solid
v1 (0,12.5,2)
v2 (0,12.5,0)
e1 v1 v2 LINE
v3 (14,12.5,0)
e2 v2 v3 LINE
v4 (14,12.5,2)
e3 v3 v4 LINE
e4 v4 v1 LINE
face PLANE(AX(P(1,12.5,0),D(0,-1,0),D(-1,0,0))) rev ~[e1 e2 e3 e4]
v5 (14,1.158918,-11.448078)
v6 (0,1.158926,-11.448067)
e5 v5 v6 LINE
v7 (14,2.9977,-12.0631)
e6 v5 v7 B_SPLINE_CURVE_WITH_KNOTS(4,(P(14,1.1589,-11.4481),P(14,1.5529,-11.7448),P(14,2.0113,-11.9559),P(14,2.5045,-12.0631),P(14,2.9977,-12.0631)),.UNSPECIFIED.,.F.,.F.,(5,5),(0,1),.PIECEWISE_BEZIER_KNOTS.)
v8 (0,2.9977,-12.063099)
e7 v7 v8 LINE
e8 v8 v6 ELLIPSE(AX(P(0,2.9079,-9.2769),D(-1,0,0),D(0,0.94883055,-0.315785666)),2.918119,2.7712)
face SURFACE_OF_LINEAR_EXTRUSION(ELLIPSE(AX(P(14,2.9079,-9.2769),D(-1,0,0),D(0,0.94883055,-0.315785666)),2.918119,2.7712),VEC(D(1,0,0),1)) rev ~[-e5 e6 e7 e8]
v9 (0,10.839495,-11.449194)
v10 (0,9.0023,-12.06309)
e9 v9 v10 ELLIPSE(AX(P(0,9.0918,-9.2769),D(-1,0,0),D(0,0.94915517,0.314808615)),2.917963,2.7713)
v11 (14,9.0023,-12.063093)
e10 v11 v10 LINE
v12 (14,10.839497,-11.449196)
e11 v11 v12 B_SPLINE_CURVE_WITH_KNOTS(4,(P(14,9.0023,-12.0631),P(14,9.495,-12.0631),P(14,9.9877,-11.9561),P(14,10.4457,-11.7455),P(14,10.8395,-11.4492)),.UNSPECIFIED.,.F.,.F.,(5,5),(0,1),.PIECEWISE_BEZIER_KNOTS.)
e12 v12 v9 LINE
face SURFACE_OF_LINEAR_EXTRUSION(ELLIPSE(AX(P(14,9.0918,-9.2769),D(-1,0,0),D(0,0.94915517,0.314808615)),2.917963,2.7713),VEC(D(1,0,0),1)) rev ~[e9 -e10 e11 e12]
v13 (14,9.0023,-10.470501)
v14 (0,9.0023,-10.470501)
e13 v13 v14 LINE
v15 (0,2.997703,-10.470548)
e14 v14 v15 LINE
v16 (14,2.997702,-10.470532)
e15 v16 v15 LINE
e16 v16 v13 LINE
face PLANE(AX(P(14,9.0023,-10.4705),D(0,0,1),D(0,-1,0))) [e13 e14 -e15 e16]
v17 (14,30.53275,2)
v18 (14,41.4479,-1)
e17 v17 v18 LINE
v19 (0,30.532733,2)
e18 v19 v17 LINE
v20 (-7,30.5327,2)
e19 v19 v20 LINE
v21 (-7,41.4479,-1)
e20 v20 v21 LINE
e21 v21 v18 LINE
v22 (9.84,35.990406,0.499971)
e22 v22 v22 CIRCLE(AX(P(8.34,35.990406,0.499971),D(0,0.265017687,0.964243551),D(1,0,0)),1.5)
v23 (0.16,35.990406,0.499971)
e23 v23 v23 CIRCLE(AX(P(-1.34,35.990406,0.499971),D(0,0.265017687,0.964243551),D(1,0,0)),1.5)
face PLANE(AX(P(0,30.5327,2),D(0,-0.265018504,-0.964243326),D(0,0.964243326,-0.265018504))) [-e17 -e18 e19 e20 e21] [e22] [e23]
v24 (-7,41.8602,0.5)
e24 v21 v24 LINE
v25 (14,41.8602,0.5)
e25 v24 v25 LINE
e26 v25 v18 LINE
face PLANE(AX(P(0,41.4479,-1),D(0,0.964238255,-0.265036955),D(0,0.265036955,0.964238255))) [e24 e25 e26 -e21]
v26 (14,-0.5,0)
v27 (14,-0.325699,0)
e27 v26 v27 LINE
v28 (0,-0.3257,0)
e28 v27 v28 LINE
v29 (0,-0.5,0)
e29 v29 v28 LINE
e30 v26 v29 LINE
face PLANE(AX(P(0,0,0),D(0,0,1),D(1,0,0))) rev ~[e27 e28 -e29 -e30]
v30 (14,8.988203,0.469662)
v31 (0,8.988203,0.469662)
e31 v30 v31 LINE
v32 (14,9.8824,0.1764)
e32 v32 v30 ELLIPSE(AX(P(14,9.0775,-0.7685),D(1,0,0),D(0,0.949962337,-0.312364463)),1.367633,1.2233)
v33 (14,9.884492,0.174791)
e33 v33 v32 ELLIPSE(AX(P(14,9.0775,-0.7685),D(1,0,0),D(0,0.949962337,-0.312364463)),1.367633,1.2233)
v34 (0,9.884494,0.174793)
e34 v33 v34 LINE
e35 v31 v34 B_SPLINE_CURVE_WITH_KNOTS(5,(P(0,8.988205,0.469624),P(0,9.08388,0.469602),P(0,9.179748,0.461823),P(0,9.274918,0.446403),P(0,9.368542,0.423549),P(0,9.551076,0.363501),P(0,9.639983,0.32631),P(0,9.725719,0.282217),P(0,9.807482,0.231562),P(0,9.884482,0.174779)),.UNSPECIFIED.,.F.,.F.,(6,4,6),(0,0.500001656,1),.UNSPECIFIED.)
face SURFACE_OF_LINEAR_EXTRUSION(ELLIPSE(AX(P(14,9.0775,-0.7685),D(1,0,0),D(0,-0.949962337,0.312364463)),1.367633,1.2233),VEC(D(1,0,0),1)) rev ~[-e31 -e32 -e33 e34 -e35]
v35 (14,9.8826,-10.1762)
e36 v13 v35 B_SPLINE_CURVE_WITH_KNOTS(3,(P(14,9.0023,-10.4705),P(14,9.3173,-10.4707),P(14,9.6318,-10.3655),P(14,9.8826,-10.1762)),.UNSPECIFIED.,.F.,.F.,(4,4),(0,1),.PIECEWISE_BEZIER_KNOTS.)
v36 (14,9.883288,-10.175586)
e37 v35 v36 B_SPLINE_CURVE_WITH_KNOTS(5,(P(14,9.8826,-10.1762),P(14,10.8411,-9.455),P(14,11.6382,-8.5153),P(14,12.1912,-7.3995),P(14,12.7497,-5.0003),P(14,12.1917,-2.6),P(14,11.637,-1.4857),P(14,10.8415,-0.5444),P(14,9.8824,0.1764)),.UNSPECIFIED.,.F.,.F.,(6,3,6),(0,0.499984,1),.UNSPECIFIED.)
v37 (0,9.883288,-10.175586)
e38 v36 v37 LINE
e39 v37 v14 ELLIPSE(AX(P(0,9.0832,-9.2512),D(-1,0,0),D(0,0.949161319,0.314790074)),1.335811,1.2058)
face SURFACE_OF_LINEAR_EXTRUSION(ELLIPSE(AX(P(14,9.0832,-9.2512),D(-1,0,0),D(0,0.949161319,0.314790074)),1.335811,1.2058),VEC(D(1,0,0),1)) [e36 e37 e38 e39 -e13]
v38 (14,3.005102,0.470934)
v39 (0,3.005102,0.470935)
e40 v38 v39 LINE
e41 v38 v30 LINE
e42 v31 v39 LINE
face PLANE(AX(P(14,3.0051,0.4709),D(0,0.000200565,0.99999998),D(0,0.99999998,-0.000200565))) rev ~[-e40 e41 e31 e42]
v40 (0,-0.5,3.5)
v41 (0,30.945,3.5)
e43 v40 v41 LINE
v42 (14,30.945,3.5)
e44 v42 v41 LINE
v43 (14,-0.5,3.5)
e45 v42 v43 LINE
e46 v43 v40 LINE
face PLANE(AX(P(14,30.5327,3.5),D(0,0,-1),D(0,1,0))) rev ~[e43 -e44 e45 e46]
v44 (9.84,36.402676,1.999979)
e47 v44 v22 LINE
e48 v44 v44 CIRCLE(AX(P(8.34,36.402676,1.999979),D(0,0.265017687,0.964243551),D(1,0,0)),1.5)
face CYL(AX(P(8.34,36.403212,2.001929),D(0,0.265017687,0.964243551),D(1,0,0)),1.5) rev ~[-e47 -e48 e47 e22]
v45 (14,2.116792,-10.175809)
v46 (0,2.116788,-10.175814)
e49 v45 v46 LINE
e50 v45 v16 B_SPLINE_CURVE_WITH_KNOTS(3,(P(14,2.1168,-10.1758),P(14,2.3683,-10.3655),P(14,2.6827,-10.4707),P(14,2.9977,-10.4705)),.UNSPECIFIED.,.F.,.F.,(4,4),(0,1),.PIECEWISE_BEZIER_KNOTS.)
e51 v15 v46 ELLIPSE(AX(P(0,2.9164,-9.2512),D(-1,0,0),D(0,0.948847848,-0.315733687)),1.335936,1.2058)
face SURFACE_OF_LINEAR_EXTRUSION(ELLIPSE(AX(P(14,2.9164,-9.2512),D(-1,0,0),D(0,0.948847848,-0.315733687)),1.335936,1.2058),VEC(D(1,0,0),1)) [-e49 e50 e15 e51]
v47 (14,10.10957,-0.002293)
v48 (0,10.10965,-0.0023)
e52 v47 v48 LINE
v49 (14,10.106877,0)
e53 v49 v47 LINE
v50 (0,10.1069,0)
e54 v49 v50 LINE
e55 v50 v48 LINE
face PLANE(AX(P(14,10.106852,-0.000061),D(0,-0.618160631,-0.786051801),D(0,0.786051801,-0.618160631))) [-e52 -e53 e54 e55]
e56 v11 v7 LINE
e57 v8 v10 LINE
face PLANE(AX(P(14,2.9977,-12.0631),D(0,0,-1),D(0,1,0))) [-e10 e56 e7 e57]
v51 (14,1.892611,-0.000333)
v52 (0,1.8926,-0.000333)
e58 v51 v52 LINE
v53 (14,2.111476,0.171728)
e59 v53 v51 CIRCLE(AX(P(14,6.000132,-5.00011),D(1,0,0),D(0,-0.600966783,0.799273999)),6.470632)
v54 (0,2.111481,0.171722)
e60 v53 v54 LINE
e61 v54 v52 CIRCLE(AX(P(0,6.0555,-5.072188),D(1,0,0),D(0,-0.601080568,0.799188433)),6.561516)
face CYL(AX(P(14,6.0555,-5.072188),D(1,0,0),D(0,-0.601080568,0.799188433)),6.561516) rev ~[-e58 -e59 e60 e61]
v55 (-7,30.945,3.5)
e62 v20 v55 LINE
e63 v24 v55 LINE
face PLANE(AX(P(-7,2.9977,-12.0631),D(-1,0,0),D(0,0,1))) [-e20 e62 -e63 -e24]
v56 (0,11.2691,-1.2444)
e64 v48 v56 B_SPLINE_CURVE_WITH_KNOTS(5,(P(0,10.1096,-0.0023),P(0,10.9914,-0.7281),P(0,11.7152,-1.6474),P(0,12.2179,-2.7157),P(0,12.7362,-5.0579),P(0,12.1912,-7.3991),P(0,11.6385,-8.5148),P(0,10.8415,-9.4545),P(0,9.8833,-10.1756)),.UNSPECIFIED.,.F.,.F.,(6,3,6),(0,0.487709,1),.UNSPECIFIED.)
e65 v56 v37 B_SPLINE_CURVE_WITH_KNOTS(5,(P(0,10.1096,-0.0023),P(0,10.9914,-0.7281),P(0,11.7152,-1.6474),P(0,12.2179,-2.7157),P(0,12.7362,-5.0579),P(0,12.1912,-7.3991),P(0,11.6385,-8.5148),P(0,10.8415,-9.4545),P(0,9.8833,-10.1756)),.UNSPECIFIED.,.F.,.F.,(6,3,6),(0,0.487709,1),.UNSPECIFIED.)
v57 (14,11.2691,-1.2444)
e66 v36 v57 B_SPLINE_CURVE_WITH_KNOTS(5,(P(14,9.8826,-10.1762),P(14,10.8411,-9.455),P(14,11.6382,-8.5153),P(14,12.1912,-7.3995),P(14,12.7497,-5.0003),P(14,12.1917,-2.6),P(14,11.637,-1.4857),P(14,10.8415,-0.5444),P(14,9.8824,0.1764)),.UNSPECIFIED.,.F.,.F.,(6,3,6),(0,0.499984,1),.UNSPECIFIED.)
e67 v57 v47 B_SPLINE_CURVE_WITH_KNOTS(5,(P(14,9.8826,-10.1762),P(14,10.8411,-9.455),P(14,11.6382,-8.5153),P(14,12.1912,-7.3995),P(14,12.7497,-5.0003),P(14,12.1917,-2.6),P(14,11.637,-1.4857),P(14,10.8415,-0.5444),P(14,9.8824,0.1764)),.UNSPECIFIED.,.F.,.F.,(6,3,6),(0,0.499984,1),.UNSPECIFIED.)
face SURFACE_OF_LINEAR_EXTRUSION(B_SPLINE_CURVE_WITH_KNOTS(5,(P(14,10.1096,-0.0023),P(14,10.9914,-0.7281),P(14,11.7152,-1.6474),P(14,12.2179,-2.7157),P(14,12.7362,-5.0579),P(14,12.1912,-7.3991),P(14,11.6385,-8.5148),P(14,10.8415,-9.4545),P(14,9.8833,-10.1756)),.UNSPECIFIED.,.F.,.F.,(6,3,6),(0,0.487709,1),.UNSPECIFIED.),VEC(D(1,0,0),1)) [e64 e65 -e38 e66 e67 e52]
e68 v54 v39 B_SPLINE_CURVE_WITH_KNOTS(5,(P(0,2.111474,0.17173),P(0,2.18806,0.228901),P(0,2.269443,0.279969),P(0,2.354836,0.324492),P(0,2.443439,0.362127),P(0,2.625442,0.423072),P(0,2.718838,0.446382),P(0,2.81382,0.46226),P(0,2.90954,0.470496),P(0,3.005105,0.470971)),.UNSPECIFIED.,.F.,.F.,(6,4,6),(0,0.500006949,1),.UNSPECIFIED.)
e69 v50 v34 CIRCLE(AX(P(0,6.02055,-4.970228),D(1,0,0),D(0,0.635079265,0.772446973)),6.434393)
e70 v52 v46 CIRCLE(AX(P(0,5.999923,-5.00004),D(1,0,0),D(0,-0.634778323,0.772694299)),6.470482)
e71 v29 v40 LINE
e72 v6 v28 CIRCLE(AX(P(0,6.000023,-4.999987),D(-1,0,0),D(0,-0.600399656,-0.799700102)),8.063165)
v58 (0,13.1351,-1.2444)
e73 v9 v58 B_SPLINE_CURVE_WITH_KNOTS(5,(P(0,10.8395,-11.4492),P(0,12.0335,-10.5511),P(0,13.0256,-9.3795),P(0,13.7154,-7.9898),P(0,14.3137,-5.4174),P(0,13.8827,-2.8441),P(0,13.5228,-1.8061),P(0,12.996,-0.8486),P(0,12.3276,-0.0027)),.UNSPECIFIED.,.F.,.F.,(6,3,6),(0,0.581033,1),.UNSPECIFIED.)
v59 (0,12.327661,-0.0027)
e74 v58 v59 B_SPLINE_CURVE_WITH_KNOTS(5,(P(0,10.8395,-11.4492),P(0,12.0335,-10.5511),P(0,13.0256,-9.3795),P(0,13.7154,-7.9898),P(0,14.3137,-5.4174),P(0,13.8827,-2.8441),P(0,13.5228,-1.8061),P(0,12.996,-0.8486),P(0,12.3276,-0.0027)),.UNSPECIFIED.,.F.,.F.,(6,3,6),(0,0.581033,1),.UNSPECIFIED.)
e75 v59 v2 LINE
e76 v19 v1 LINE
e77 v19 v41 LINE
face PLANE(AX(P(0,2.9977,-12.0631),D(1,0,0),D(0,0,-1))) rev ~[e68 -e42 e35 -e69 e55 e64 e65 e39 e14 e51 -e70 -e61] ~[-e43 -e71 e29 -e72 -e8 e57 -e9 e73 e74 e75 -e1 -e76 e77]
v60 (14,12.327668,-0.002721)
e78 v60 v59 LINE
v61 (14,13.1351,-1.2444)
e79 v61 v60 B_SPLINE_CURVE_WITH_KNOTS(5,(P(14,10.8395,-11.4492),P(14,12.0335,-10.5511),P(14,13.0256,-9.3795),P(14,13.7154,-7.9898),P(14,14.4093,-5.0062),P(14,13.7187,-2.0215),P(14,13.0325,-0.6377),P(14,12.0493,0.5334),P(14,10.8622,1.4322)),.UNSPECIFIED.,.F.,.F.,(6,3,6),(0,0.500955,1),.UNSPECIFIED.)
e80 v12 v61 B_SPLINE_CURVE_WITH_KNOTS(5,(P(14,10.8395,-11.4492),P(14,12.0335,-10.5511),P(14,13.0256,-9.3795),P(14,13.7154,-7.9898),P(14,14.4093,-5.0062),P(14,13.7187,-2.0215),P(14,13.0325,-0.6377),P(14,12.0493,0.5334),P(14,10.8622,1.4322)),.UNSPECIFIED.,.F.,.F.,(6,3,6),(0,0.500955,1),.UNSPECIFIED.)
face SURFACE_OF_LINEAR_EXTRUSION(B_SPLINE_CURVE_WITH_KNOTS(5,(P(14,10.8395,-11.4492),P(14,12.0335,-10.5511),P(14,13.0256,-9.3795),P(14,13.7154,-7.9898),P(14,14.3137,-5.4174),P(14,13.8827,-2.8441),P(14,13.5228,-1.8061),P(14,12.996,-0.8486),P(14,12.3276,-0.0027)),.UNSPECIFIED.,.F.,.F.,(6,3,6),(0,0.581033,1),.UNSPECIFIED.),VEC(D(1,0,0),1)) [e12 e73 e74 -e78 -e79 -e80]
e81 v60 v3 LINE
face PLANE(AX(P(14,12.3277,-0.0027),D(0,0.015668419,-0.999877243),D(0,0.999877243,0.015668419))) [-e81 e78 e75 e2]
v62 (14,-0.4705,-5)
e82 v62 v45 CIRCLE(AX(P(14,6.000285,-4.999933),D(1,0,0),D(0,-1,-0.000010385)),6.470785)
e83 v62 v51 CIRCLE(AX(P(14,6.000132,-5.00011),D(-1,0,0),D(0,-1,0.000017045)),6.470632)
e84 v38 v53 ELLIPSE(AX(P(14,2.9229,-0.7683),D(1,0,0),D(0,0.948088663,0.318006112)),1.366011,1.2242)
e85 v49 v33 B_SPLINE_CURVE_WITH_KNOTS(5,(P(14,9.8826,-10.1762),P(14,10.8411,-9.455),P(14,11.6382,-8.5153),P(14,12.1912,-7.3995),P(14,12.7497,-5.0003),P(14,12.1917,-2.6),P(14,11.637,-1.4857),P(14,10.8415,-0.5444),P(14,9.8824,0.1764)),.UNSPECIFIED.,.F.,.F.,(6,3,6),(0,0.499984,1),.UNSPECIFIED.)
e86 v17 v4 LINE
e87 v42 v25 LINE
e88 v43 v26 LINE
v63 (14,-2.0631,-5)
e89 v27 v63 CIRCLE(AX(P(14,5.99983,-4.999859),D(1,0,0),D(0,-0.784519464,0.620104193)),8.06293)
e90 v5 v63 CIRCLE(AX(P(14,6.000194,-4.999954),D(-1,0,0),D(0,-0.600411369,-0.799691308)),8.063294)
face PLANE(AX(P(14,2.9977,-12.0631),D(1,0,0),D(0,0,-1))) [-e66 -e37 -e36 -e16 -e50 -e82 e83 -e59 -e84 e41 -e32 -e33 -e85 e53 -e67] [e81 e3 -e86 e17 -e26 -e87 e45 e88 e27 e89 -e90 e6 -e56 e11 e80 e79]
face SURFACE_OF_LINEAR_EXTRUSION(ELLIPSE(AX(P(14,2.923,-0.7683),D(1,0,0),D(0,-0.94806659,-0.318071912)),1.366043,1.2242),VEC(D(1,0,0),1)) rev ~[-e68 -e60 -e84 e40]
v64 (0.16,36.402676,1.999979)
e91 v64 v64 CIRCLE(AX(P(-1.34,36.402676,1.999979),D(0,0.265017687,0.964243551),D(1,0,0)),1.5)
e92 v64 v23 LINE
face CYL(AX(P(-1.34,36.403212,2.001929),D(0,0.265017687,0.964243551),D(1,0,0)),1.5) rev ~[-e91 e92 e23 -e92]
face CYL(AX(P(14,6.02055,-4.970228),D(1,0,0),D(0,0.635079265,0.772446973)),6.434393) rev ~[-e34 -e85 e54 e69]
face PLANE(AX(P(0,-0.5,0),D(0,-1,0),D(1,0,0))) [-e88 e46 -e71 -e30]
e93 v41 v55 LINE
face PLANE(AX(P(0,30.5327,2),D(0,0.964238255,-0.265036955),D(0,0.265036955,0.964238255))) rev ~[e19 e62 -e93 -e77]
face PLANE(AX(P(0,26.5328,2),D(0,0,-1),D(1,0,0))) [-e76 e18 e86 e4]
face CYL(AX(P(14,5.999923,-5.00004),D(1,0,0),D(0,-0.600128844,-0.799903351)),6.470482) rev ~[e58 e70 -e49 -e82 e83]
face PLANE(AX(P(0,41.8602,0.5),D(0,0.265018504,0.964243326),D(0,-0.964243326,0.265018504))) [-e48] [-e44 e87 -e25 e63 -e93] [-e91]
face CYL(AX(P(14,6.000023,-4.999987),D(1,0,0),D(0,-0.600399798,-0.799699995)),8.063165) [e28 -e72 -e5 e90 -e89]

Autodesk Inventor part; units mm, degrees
ref_plane "YZ Plane" through (0, 0, 0) normal (1, 0, 0) x (0, 1, 0)
ref_plane "XZ Plane" through (0, 0, 0) normal (0, 1, 0) x (-1, 0, 0)
sketch "Sketch1" plane through (0, 0, 0) normal (0, 0, 1) x (1, 0, 0)
  line L0 (1, 9) -> (14, 9) projected
  line L1 (1, 3) -> (1, 9) projected
  line L2 (14, 3) -> (1, 3) projected
  line L3 (14, 9) -> (14, 3) projected
  line L4 (1, 12) -> (14, 12)
  line L5 (1, 0) -> (14, 0)
  line L6 (1, 12.5) -> (14, 12.5)
  line L7 (1, -0.5) -> (14, -0.5)
  line L8 (0, 1.4) -> (0, 10.6) projected
  line L9 (0, -0.5) -> (14, -0.5)
  line L10 (14, -0.5) -> (14, 12.5)
  line L11 (14, 12.5) -> (0, 12.5)
  line L12 (0, 12.5) -> (0, -0.5)
  point P0 (0, 0)
  dimension "d0" = 0.5
  dimension "d1" = 0.5
extrude "Extrusion1" add sketch "Sketch1" along normal blind 2
sketch "Sketch2" plane through (14, -0.5, 0) normal (1, 0, 0) x (0, 0, -1)
  line L0 (10, 9.5) -> (10, 3.5) projected
  line L1 (10.5, 9.5) -> (10.5, 3.5)
  line L2 (0, 13) -> (0, 0) projected
  line L3 (0.0028, 13) -> (0, 0)
  arc A0 (5, 0.5) -> (9.8, 2.9) centre (5, 6.5) ccw projected
  spline S0 degree 3 poles (9.8, 10.1) (9.3822, 10.6561) (8.439, 11.5426) (6.738, 12.3306) (5.0002, 12.5848) (3.2616, 12.3308) (1.5615, 11.5422) (0.6175, 10.6564) (0.2, 10.1) knots 0.000048 0.000048 0.000048 0.000048 1.982593 3.634064 5.285536 6.937008 8.58848 10.571071 10.571071 10.571071 10.571071 weights 1 1 1 1 1 1 1 1 1 projected
  arc A1 (0.2, 2.9) -> (5, 0.5) centre (5, 6.5) ccw projected
  ellipse E0 centre (0.7683, 3.4229) end of major axis (0.4925, 4.2518) minor radius 0.7558 (0, 3.5) -> (0.2, 2.9) ccw projected
  ellipse E1 centre (0.7685, 9.5775) end of major axis (1.0457, 10.4061) minor radius 0.7558 (0.2, 10.1) -> (0, 9.5) ccw projected
  ellipse E2 centre (9.2317, 3.4229) end of major axis (9.5075, 4.2518) minor radius 0.7558 (9.8, 2.9) -> (10, 3.5) ccw projected
  ellipse E3 centre (9.2318, 9.5768) end of major axis (8.9568, 10.4058) minor radius 0.7558 (10, 9.5) -> (9.7999, 10.1) ccw projected
  arc A2 (5, 0.0295) -> (10.1758, 2.6168) centre (5, 6.5) ccw
  arc A3 (-0.1717, 2.6115) -> (5, 0.0295) centre (5, 6.5) ccw
  line L4 (10.4705, 3.4977) -> (10.4705, 9.5023)
  ellipse E4 centre (0.7683, 3.4229) end of major axis (0.3339, 4.718) minor radius 1.2242 (-0.4709, 3.5051) -> (-0.1717, 2.6115) ccw
  ellipse E5 centre (0.7685, 9.5775) end of major axis (1.1957, 10.8767) minor radius 1.2233 (-0.1748, 10.3845) -> (-0.4697, 9.4882) ccw
  arc A4 (0.2, 2.9) -> (9.8, 2.9) centre (5, 6.5) ccw projected
  arc A5 (5, -1.5631) -> (11.4481, 1.6589) centre (5, 6.5) ccw
  arc A6 (-1.4235, 1.6263) -> (5, -1.5631) centre (5, 6.5) ccw
  line L5 (12.0631, 3.4977) -> (12.0631, 9.5023)
  ellipse E6 centre (0.7683, 3.4229) end of major axis (-0.2657, 6.5587) minor radius 2.7801 (-2.0629, 3.5774) -> (-1.4235, 1.6263) ccw
  ellipse E7 centre (0.7685, 9.5775) end of major axis (1.7896, 12.7173) minor radius 2.7798 (-1.4322, 11.3622) -> (-2.0617, 9.4138) ccw
  line L6 (-0.4709, 3.5051) -> (-0.4697, 9.4882)
  line L7 (-2.0629, 3.5774) -> (-2.0617, 9.4138)
  spline S1 degree 5 poles (10.1762, 10.3826) (9.455, 11.3411) (8.5153, 12.1382) (7.3995, 12.6912) (5.0003, 13.2497) (2.6, 12.6917) (1.4857, 12.137) (0.5444, 11.3415) (-0.1764, 10.3824) knots 0 0 0 0 0 0 0.499984 0.499984 0.499984 1 1 1 1 1 1
  spline S2 degree 3 poles (10.1759, 2.6167) (10.3655, 2.8683) (10.4707, 3.1827) (10.4707, 3.4977) knots 0 0 0 0 1 1 1 1
  spline S3 degree 3 poles (10.4707, 9.5023) (10.4707, 9.8173) (10.3655, 10.1318) (10.1757, 10.3833) knots 0 0 0 0 1 1 1 1
  spline S4 degree 4 poles (11.4481, 1.6589) (11.7448, 2.0529) (11.9559, 2.5113) (12.0631, 3.0045) (12.0631, 3.4977) knots 0 0 0 0 0 1 1 1 1 1
  spline S5 degree 4 poles (12.0631, 9.5023) (12.0631, 9.995) (11.9561, 10.4877) (11.7455, 10.9457) (11.4492, 11.3395) knots 0 0 0 0 0 1 1 1 1 1
  spline S6 degree 5 poles (11.4495, 11.3391) (10.5511, 12.5335) (9.3795, 13.5256) (7.9898, 14.2154) (5.0062, 14.9093) (2.0215, 14.2187) (0.6377, 13.5325) (-0.5334, 12.5493) (-1.4322, 11.3622) knots 0 0 0 0 0 0 0.500955 0.500955 0.500955 1 1 1 1 1 1
  point P0 (0, 0.5)
  point P1 (0, 10.6069)
  point P2 (0, 12.8255)
  point P3 (0, 0.1744)
  point P4 (0, 2.393)
  point P5 (0.0005, 2.3924)
  point P6 (0, 0.1743)
  point P7 (0.0027, 12.8276)
  point P8 (0.0023, 10.6096)
extrude "Extrusion2" add sketch "Sketch2" along normal blind 2 contours L3 S6 S5 L5 S4 A5 A6 L2 A3 A2 S2 L4 S3 S1 | S1 E5 L6 E4 A3 L2 A6 E6 L7 E7 S6
sketch "Sketch3" plane through (14, 1.893, 0) normal (1, 0, 0) x (0, 0, -1)
  arc A0 (-0.1717, 0.2185) -> (0, 0) centre (5, 4.107) ccw projected
  line L0 (0, 0) -> (0, 8.2139) projected
  arc A1 (0, 8.2139) -> (-0.1748, 7.9915) centre (4.9785, 4.1209) ccw projected
  ellipse E0 centre (0.7685, 7.1845) end of major axis (0.3413, 5.8853) minor radius 1.2233 (-0.1748, 7.9915) -> (-0.4697, 7.0952) ccw projected
  line L1 (-0.4697, 7.0952) -> (-0.4709, 1.1121) projected
  ellipse E1 centre (0.7683, 1.03) end of major axis (1.2028, -0.2651) minor radius 1.2242 (-0.4709, 1.1121) -> (-0.1717, 0.2185) ccw projected
  point P0 (0, -1.893)
extrude "Extrusion3" cut sketch "Sketch3" against normal through all
sketch "Sketch4" plane through (14, -0.5, 0) normal (-1, 0, 0) x (0, 0, 1)
  line L0 (-10.4705, 9.5023) -> (-10.4705, 3.4977) projected
  ellipse E0 centre (-9.2512, 9.5832) end of major axis (-8.8307, 10.8511) minor radius 1.2058 (-10.1756, 10.3833) -> (-10.4705, 9.5023) ccw projected
  spline S0 degree 5 poles (-0.0023, 10.6096) (-0.7281, 11.4914) (-1.6474, 12.2152) (-2.7157, 12.7179) (-5.0579, 13.2362) (-7.3991, 12.6912) (-8.5148, 12.1385) (-9.4545, 11.3415) (-10.1756, 10.3833) knots 0 0 0 0 0 0 0.487709 0.487709 0.487709 1 1 1 1 1 1 projected
  line L1 (-0.0027, 12.8276) -> (-0.0023, 10.6096) projected
  spline S1 degree 5 poles (-11.4492, 11.3395) (-10.5511, 12.5335) (-9.3795, 13.5256) (-7.9898, 14.2154) (-5.4174, 14.8137) (-2.8441, 14.3827) (-1.8061, 14.0228) (-0.8486, 13.496) (-0.0027, 12.8277) knots 0 0 0 0 0 0 0.581033 0.581033 0.581033 1 1 1 1 1 1 projected
  ellipse E1 centre (-9.2769, 9.5918) end of major axis (-8.3583, 12.3614) minor radius 2.7713 (-11.4492, 11.3395) -> (-12.0631, 9.5023) ccw projected
  line L2 (-12.0631, 3.4977) -> (-12.0631, 9.5023) projected
  ellipse E2 centre (-9.2769, 3.4079) end of major axis (-10.1984, 6.1767) minor radius 2.7712 (-12.0631, 3.4977) -> (-11.4481, 1.6589) ccw projected
  arc A0 (-11.4481, 1.6589) -> (0, 0.1743) centre (-5, 6.5) ccw projected
  line L3 (-0.0005, 2.3924) -> (0, 0.1743) projected
  arc A1 (-10.1758, 2.6168) -> (-0.0005, 2.3924) centre (-5, 6.5) ccw projected
  ellipse E3 centre (-9.2512, 3.4164) end of major axis (-9.673, 4.684) minor radius 1.2058 (-10.4705, 3.4977) -> (-10.1758, 2.6168) ccw projected
  point P0 (0, 0.5)
extrude "Extrusion4" add sketch "Sketch4" along normal up to surface (14 mm away)
sketch "Sketch5" plane through (0, -0.5, 0) normal (0, -1, 0) x (1, 0, 0)
  line L0 (0, 2) -> (14, 2) projected
  line L1 (0, 2) -> (14, 2)
  line L2 (14, 2) -> (14, 3.5)
  line L3 (14, 3.5) -> (0, 3.5)
  line L4 (0, 3.5) -> (0, 2)
  point P0 (0, 0)
  dimension "d22" = 1.5
ref_plane "Work Plane1" through (-71.4012, 38.5222, -12.5) normal (0.0153412, 0.9998823, 0) x (0, 0, 1)
extrude "Extrusion5" add sketch "Sketch5" against normal up to surface surface through (-71.4012, 38.5222, -12.5) normal (0.0153412, 0.9998823, 0)
sketch "Sketch6" plane through (0, -0.5, 3.5) normal (0, 0, 1) x (1, 0, 0)
  line L0 (14, 0) -> (14, 37.7119) projected
  line L1 (14, 37.7119) -> (0, 37.9267) projected
  line L2 (-54.2389, 27.7576) -> (-67.6625, 27.9635) projected
  line L3 (14, 37.7119) -> (14, 26.7106)
  line L4 (14, 13) -> (14, 37.7119) projected
  line L5 (14, 26.7106) -> (-6.9975, 27.0328)
  line L6 (14, 37.7119) -> (-6.9975, 38.034)
  line L7 (-6.9975, 38.034) -> (-6.9975, 27.0328)
  point P0 (0, 0.5)
  point P1 (4.9084, 26.8501)
  dimension "d25" = 21
  dimension "d26" = 21
extrude "Extrusion6" add sketch "Sketch6" against normal blind 1.5
sketch "Sketch7" plane through (0, -0.5, 3.5) normal (0, 0, 1) x (1, 0, 0)
  line L0 (14, 0) -> (14, 37.7119) projected
  line L1 (14, -3.9463) -> (21.7341, -3.9463)
  line L2 (21.7341, -3.9463) -> (21.7341, 19.3789)
  line L3 (21.7341, 19.3789) -> (14, 19.3789)
  line L4 (14, 19.3789) -> (14, -3.9463)
  point P0 (0, 0.5)
extrude "Extrusion7" cut sketch "Sketch7" against normal blind 15.75
sketch "Sketch8" plane through (14, 10.1069, 0) normal (1, 0, 0) x (0, 0, -1)
  ellipse E0 centre (9.2512, -1.0236) end of major axis (8.8307, 0.2442) minor radius 1.2058 (10.4705, -1.1046) -> (10.1756, -0.2236) ccw projected
  line L0 (10.4705, -7.1091) -> (10.4705, -1.1046) projected
  ellipse E1 centre (9.2512, -7.1904) end of major axis (9.673, -5.9229) minor radius 1.2058 (10.1758, -7.9901) -> (10.4705, -7.1091) ccw projected
  arc A0 (0.0005, -8.2145) -> (10.1758, -7.9901) centre (5, -4.1069) ccw projected
  line L1 (0, -10.4326) -> (0.0005, -8.2145) projected
  arc A1 (0, -10.4326) -> (11.4481, -8.948) centre (5, -4.1069) ccw projected
  ellipse E2 centre (9.2769, -7.199) end of major axis (10.1984, -4.4302) minor radius 2.7712 (11.4481, -8.948) -> (12.0631, -7.1091) ccw projected
  line L2 (12.0631, -1.1046) -> (12.0631, -7.1091) projected
  ellipse E3 centre (9.2769, -1.0151) end of major axis (8.3583, 1.7545) minor radius 2.7713 (12.0631, -1.1046) -> (11.4492, 0.7326) ccw projected
  spline S0 degree 5 poles (0.0027, 2.2208) (0.8486, 2.8891) (1.8061, 3.4159) (2.8441, 3.7759) (5.4174, 4.2068) (7.9898, 3.6085) (9.3795, 2.9188) (10.5511, 1.9266) (11.4492, 0.7326) knots 0 0 0 0 0 0 0.418967 0.418967 0.418967 1 1 1 1 1 1 projected
  line L3 (0.0023, 0.0028) -> (0.0027, 2.2208) projected
  spline S1 degree 5 poles (10.1756, -0.2236) (9.4545, 0.7346) (8.5148, 1.5316) (7.3991, 2.0844) (5.0579, 2.6294) (2.7157, 2.111) (1.6474, 1.6084) (0.7281, 0.8845) (0.0023, 0.0027) knots 0 0 0 0 0 0 0.512291 0.512291 0.512291 1 1 1 1 1 1 projected
  arc A2 (-0.1717, -7.9954) -> (0, -8.2139) centre (5, -4.1069) ccw projected
  ellipse E4 centre (0.7683, -7.184) end of major axis (1.2028, -8.479) minor radius 1.2242 (-0.4709, -7.1018) -> (-0.1717, -7.9954) ccw projected
  ellipse E5 centre (0.7685, -1.0294) end of major axis (0.3413, -2.3286) minor radius 1.2233 (-0.1748, -0.2224) -> (-0.4697, -1.1187) ccw projected
  arc A3 (0, 0) -> (-0.1748, -0.2224) centre (4.9785, -4.093) ccw projected
  line L4 (-0.4697, -1.1187) -> (-0.4709, -7.1018) projected
  line L5 (0, 0) -> (0, 2.3931) projected
  line L6 (0, 2.3931) -> (-2, 2.3931) projected
  line L7 (0, -10.6069) -> (0, -8.2139) projected
  line L8 (0, -10.6069) -> (-3.5, -10.6069) projected
  line L9 (1.2443, -11.2419) -> (1.2443, -9.3759)
  arc A4 (0.0005, -8.2145) -> (10.1758, -7.9901) centre (5, -4.1069) ccw projected
  arc A5 (0.0005, -8.2145) -> (1.2443, -9.3759) centre (4.9979, -4.1091) ccw
  line L10 (0, -8.2139) -> (-0.1717, -7.9954)
  ellipse E6 centre (0.7683, -7.184) end of major axis (1.2028, -8.479) minor radius 1.2242 (-0.4709, -7.1018) -> (-0.1717, -7.9954) ccw projected
  line L11 (-0.1717, -7.9954) -> (-0.1717, -10.6069)
  line L12 (0, -10.6069) -> (-0.1717, -10.6069)
  line L13 (0, -10.6069) -> (0, -10.4326)
  arc A6 (0, -10.4326) -> (1.2443, -11.2419) centre (5, -4.1069) ccw
  line L14 (1.2444, 1.1622) -> (1.2444, 3.0282)
  arc A7 (1.2444, 3.0282) -> (0.0027, 2.2208) centre (4.9892, -4.0883) ccw
  line L15 (0, 2.3931) -> (0, 0) projected
  line L16 (0.0027, 2.2208) -> (0, 2.3931)
  line L17 (0, 2.3931) -> (-0.1717, 2.3931)
  line L18 (-0.1717, 2.3931) -> (-0.1748, -0.2224)
  line L19 (-0.1748, -0.2224) -> (0.0023, 0.0028)
  line L20 (0.0005, -8.2145) -> (0, -8.2139)
  point P0 (0, -10.1069)
extrude "Extrusion8" add sketch "Sketch8" against normal up to surface (14 mm away) contours S1 L3 S0 L14 | L19 L5 L16 L3 | L9 A1 L1 A0 | A3 L18 L6 L5 | L1 L7 L8 L11 A2
sketch "Sketch9" plane through (0, -0.5, 3.5) normal (0, 0, 1) x (1, 0, 0)
  line L0 (0, 0) -> (0, 26.9254) projected
  line L1 (14, 0) -> (0, 0) projected
  line L2 (14, 0) -> (14, 37.7119) projected
  line L3 (14, 37.7119) -> (-6.9975, 38.034) projected
  line L4 (-6.9975, 38.034) -> (-6.9975, 27.0328) projected
  line L5 (-6.9975, 27.0328) -> (0, 26.9254) projected
  line L6 (-6.9975, 38.034) -> (14, 37.7119) projected
  line L7 (-6.9975, 38.034) -> (14, 26.7132)
  line L8 (14, 13) -> (14, 37.7119) projected
  line L9 (14, 37.7119) -> (-6.9975, 27.0328)
  line L10 (-6.9975, 38.034) -> (-6.9975, 27.0328) projected
  line L11 (-6.9975, 32.3723) -> (14, 32.3723)
  line L12 (-6.9975, 32.3723) -> (0.0025, 32.3723)
  line L13 (14, 32.3723) -> (7, 32.3723)
  line L14 (-6.9975, 32.3723) -> (-1.9975, 32.3723)
  line L15 (14, 32.3723) -> (9, 32.3723)
  circle A0 centre (-1.9975, 32.3723) radius 1.5
  circle A1 centre (9, 32.3723) radius 1.5
  point P0 (0, 0.5)
  dimension "d35" = 5
  dimension "d36" = 5
  dimension "d37" = 3
  dimension "d38" = 3
extrude "Extrusion9" cut sketch "Sketch9" against normal blind 3 contours A0 L11 | L11 A0 | A1 L11 | L11 A1
sketch "Sketch10" plane through (14, 2.9977, -12.0631) normal (1, 0, 0) x (0, 0, -1)
  line L0 (-12.0631, 9.5023) -> (-14.0631, 9.5023) projected
  line L1 (-15.5631, -3.4977) -> (-15.5631, 34.2141) projected
  line L2 (-15.5631, 23.535) -> (-15.5631, 23.4276) projected
  line L3 (-15.5631, 23.535) -> (-14.0631, 23.535) projected
  line L4 (-14.0631, 9.5023) -> (-14.0631, 34.2141) projected
  line L5 (-14.0631, 34.2141) -> (-15.5631, 34.2141) projected
  line L6 (-15.5631, 34.2141) -> (-12.5631, 34.2141)
  line L7 (-14.0631, 34.2141) -> (-11.0631, 34.2141)
  line L8 (-14.0631, 23.535) -> (-11.0631, 34.2141)
  line L9 (-11.0631, 34.2141) -> (-12.5072, 34.6198)
  line L10 (-12.5072, 34.6198) -> (-15.5631, 23.535)
  point P0 (-12.0631, -2.9977)
  point P1 (-12.6191, 34.2141)
  point P2 (-14.0631, 28.976)
  point P3 (-12.5631, 34.2141)
  dimension "d41" = 3
  dimension "d42" = 3
  dimension "d43" = 1.5
extrude "Extrusion10" add sketch "Sketch10" against normal up to surface (20.9975 mm away) contours L4 L10 L6 L7 L8
sketch "Sketch11" plane through (14, 2.9977, -12.0631) normal (1, 0, 0) x (0, 0, -1)
  line L0 (-15.5631, -3.4977) -> (-15.5631, 34.2141) projected
  line L1 (-14.0631, 28.976) -> (-14.0631, 34.2141) projected
  line L2 (-15.5631, 34.5363) -> (-14.0631, 34.5363) projected
  line L3 (-15.5631, 34.2141) -> (-15.5631, 34.5363) projected
  line L4 (-14.0631, 34.5363) -> (-14.0631, 34.2141) projected
  line L5 (-12.6191, 34.2141) -> (-14.0631, 28.976) projected
  line L6 (-15.5631, 23.535) -> (-14.0631, 23.535) projected
  line L7 (-12.6191, 34.2141) -> (-15.5631, 23.535)
  point P0 (-12.0631, -2.9977)
  point P1 (-14.0631, 28.976)
extrude "Extrusion11" cut sketch "Sketch11" against normal through all
sketch "Sketch12" plane through (-6.9975, 26.5328, 3.5) normal (0, 0.2657691, 0.9640367) x (1, 0, 0)
  ellipse E0 centre (15.9975, 5.5388) end of major axis (15.9975, 3.9828) minor radius 1.5 (14.501, 5.644) -> (17.4941, 5.644) ccw projected
  ellipse E1 centre (5, 5.5388) end of major axis (5, 3.9828) minor radius 1.5 (3.5034, 5.644) -> (6.4966, 5.644) ccw projected
  line L0 (17.4941, 5.644) -> (14.501, 5.644) projected
  line L1 (6.4966, 5.644) -> (3.5034, 5.644) projected
  point P0 (6.9975, -24.6484)
extrude "Extrusion12" add sketch "Sketch12" against normal up to surface surface through (14, 37.2119, -1) normal (0, -0.2704527, -0.9627333)
sketch "Sketch13" plane through (-6.9975, 26.5328, 3.5) normal (0, 0.2657691, 0.9640367) x (1, 0, 0)
  line L0 (0, 0.3987) -> (20.9975, 0.3987) projected
  line L1 (20.9975, 11.0775) -> (20.9975, 0) projected
  line L2 (20.9975, 11.0775) -> (0, 11.0775) projected
  line L3 (0, 0) -> (0, 11.0775) projected
  circle A0 centre (15.6581, 5.7381) radius 5.3394
  circle A1 centre (5.3394, 5.7381) radius 5.3394
  circle A2 centre (15.6581, 5.7381) radius 1.5
  circle A3 centre (5.3394, 5.7381) radius 1.5
  point P0 (6.9975, -24.6484)
  dimension "d50" = 3
  dimension "d51" = 3
extrude "Extrusion13" cut sketch "Sketch13" against normal through all contours A2 | A3
sketch "Sketch14" plane through (14, 2.9977, -12.0631) normal (1, 0, 0) x (0, 0, -1)
  line L0 (-12.6191, 34.2141) -> (-15.5631, 23.535) projected
  line L1 (-14.0631, 23.535) -> (-11.0631, 34.2141) projected
  line L2 (-11.0631, 34.2141) -> (-12.6191, 34.2141) projected
  line L3 (-15.5631, -3.4977) -> (-15.5631, 23.535) projected
  line L4 (-15.5631, 23.535) -> (-14.0631, 23.535)
  point P0 (-12.0631, -2.9977)
extrude "Extrusion14" cut sketch "Sketch14" against normal through all
sketch "Sketch15" plane through (0, 2.9977, -12.0631) normal (-1, 0, 0) x (0, 0, 1)
  line L0 (15.5631, 23.4276) -> (14.0631, 23.4276) projected
  line L1 (15.5631, 23.535) -> (15.5631, 23.4276) projected
  line L2 (15.5631, 23.535) -> (14.0631, 23.535) projected
  line L3 (14.0631, 23.4276) -> (14.0631, 23.535) projected
  point P0 (12.0631, -2.9977)
extrude "Extrusion15" cut sketch "Sketch15" along normal blind 10
sketch "Sketch17" plane through (14, 26.5328, 3.5) normal (0, 1, 0) x (1, 0, 0)
  line L0 (-14, 1.5) -> (-14, 0) projected
  line L1 (0, 0) -> (-14, 0) projected
  line L2 (0, 1.5) -> (0, 0) projected
  line L3 (-14, 1.5) -> (0, 1.5) projected
  point P0 (-14, 3.5)
extrude "Extrusion16" add sketch "Sketch17" along normal blind 4
sketch "Sketch18" plane through (14, 2.9977, -12.0631) normal (1, 0, 0) x (0, 0, -1)
  line L0 (-15.5631, 27.535) -> (-14.0631, 27.535) projected
  line L1 (-14.0631, 9.5023) -> (-14.0631, 27.535) projected
  line L2 (-14.0631, 27.535) -> (-11.0631, 27.535)
  line L3 (-14.0631, 27.535) -> (-11.0631, 38.4502)
  line L4 (-15.5631, -3.4977) -> (-15.5631, 27.535) projected
  line L5 (-15.5631, 27.535) -> (-15.5631, 27.9473)
  line L6 (-15.5631, 27.9473) -> (-12.5631, 38.8625)
  line L7 (-12.5631, 38.8625) -> (-11.0631, 38.4502)
  point P0 (-12.0631, -2.9977)
  dimension "d60" = 3
  dimension "d61" = 11.32
extrude "Extrusion17" add sketch "Sketch18" against normal up to surface (14 mm away)
sketch "Sketch19" plane through (0, 2.9977, -12.0631) normal (-1, 0, 0) x (0, 0, 1)
  line L0 (14.0631, 27.535) -> (11.0631, 38.4502) projected
  line L1 (11.0631, 38.4502) -> (12.5631, 38.8625) projected
  line L2 (12.5631, 38.8625) -> (15.5631, 27.9473) projected
  line L3 (14.0631, 27.535) -> (15.5631, 27.9473)
  point P0 (12.0631, -2.9977)
extrude "Extrusion18" add sketch "Sketch19" along normal blind 7
sketch "Sketch20" plane through (-7, 41.8603, 0.5) normal (0, 0.2650177, 0.9642436) x (1, 0, 0)
  line L0 (21, -11.32) -> (7, -11.32) projected
  line L1 (21, 0) -> (21, -11.32) projected
  line L2 (21, 0) -> (0, 0) projected
  line L3 (0, -11.32) -> (0, 0) projected
  line L4 (7, -11.32) -> (0, -11.32) projected
  circle A0 centre (5.66, -5.66) radius 5.66
  circle A1 centre (15.34, -5.66) radius 5.66
  circle A2 centre (15.34, -5.66) radius 1.5
  circle A3 centre (5.66, -5.66) radius 1.5
  point P0 (7, -40.231)
  dimension "d66" = 3
  dimension "d67" = 3
extrude "Extrusion19" cut sketch "Sketch20" against normal blind 7 contours A2 | A3
equation "\"d39\" = d37"
properties part number "leftWheeler_3DPrint"
